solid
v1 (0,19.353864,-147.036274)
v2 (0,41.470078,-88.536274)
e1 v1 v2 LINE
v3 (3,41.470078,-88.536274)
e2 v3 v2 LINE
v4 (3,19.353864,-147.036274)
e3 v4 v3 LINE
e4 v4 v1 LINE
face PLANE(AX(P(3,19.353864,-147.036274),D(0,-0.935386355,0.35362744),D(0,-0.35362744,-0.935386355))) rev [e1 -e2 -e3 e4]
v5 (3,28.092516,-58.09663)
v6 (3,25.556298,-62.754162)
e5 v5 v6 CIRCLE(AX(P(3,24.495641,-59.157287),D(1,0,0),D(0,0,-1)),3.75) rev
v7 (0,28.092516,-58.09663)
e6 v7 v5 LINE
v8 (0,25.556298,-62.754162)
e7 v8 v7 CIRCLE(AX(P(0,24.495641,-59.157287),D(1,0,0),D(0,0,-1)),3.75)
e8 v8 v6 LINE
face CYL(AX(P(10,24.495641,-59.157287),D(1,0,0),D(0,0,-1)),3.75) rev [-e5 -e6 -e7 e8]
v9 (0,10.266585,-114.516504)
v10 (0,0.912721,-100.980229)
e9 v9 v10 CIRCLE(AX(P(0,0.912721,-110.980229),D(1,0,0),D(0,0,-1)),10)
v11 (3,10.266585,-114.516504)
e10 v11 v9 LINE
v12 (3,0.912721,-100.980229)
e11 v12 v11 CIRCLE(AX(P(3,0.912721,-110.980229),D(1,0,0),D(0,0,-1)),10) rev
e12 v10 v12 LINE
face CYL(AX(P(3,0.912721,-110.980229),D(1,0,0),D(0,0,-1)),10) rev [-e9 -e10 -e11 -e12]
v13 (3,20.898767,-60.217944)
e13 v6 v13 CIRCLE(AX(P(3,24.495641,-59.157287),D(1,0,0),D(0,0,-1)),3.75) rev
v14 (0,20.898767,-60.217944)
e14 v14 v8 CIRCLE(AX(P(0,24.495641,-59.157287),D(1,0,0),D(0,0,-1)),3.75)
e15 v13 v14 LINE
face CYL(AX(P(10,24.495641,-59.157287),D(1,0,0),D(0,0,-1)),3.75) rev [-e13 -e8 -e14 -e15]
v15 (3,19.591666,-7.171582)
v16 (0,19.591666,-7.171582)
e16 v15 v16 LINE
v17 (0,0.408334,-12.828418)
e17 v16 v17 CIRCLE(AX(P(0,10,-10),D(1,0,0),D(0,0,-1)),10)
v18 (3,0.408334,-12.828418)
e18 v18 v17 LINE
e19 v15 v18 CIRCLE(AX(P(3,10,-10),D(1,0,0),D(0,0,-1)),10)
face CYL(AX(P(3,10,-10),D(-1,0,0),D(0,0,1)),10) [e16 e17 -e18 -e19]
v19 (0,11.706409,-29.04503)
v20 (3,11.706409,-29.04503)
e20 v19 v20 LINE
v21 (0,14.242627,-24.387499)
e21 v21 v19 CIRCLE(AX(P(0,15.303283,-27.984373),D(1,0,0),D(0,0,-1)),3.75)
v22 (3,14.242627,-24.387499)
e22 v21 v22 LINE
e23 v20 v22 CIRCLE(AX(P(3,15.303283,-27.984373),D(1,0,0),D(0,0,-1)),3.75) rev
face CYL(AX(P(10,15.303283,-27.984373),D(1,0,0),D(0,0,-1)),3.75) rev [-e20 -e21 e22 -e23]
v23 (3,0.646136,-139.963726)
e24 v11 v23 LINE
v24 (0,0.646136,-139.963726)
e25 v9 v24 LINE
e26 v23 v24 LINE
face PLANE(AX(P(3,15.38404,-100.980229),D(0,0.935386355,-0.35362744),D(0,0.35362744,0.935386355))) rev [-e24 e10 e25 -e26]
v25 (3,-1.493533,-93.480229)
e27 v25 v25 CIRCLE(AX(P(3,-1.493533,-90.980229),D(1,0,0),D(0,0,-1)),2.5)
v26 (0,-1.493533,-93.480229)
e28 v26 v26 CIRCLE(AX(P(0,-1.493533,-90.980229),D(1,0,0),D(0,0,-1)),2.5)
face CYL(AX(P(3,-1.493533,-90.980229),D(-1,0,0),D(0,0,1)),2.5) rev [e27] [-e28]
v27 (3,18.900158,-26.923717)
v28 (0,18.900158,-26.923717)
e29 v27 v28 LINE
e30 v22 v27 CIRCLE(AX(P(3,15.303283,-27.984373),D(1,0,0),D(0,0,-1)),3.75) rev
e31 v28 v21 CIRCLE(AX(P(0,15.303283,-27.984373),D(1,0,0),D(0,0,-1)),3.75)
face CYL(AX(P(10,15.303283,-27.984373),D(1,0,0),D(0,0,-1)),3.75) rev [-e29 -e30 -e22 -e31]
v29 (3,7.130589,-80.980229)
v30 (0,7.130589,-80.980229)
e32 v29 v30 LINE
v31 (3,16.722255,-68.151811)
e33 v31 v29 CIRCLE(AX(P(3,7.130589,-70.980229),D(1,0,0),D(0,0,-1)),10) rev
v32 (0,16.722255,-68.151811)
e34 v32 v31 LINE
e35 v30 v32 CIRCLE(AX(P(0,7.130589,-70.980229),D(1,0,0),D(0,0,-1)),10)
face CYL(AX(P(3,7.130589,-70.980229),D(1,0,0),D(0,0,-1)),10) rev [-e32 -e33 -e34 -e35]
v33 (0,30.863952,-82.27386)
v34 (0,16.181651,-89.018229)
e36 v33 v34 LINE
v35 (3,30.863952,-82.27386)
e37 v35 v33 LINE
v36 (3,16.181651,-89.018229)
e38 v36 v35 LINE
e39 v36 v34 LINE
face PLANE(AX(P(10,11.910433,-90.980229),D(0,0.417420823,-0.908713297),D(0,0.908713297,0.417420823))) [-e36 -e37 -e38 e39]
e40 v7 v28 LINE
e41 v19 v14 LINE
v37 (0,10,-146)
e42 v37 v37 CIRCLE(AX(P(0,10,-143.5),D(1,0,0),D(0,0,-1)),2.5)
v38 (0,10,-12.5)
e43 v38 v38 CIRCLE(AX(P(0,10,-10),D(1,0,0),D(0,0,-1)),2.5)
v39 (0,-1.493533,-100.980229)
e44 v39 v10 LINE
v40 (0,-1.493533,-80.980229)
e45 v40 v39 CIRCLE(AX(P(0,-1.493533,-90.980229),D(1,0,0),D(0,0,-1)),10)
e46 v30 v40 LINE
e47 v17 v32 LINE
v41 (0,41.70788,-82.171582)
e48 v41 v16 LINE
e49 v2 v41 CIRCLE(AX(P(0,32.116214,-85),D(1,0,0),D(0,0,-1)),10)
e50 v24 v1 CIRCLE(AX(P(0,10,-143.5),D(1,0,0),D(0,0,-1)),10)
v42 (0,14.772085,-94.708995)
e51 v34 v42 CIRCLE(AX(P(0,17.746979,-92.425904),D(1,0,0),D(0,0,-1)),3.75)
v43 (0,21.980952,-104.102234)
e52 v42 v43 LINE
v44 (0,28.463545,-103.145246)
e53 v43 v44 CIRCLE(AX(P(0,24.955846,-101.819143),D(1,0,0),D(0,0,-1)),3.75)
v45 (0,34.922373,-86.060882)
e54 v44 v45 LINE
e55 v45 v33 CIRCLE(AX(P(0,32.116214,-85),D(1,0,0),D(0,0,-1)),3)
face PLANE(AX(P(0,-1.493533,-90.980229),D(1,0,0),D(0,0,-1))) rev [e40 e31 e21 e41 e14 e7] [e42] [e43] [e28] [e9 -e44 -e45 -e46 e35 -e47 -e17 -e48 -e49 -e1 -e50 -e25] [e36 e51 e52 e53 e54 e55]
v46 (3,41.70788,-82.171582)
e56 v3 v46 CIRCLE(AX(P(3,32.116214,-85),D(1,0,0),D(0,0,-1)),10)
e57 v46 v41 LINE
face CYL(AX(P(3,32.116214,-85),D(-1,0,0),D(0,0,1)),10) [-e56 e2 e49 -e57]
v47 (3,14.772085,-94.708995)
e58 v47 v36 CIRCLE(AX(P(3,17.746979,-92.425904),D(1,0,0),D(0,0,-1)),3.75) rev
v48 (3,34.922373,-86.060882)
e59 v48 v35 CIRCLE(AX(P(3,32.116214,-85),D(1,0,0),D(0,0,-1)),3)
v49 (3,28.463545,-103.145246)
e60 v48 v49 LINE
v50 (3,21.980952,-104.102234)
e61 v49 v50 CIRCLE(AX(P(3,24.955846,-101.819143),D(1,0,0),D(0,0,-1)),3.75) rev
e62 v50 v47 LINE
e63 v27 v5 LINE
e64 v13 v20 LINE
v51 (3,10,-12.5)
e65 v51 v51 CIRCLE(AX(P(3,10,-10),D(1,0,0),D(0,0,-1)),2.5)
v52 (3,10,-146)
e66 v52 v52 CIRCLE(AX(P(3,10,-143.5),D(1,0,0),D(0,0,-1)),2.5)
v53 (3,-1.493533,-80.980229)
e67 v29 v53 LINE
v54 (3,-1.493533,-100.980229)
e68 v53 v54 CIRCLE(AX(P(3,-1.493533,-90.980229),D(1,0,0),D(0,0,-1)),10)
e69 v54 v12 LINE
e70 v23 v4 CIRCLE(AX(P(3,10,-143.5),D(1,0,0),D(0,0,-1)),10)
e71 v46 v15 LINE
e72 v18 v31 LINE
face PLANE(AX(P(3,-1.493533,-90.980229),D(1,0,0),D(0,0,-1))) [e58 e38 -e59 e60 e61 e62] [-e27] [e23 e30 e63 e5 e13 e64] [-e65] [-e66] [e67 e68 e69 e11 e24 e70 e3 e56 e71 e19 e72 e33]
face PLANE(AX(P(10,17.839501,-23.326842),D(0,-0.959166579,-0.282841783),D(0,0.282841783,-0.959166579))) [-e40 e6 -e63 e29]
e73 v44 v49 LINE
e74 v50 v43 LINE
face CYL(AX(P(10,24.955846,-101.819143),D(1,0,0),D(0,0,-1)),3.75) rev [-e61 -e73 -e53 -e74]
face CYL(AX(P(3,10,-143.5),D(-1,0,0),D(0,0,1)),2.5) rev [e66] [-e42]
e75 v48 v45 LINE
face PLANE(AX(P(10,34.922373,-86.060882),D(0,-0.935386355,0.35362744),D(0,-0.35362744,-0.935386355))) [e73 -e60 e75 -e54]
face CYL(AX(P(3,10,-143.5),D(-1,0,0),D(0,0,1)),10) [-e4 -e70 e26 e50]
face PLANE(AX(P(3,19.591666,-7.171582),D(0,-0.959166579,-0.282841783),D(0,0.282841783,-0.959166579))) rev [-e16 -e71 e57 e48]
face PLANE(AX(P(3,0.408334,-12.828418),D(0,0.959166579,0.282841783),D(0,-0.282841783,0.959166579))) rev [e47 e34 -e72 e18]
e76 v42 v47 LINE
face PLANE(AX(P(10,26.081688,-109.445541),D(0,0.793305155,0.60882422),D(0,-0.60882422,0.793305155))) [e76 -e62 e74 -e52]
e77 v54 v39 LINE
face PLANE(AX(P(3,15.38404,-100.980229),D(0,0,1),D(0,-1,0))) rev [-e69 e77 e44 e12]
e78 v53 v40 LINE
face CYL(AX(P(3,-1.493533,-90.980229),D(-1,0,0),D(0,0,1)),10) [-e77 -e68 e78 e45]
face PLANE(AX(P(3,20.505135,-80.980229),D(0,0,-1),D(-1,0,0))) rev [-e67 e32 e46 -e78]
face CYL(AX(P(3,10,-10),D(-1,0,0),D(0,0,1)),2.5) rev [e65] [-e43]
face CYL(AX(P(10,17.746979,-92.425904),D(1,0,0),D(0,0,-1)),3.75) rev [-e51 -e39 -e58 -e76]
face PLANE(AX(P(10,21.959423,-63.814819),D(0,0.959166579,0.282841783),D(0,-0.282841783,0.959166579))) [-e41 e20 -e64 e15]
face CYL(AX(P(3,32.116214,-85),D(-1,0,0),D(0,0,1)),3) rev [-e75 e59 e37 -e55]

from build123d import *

# Parameters (mm, degrees)
SKETCH3_R           = 3
SKETCH3_R_2         = 2.5
BOSS_EXTRUDE2_DEPTH = 3
FILLET1_R           = 10
CUT_EXTRUDE1_DEPTH  = 10
FILLET2_R           = 3.75


with BuildPart() as part:
    # Sketch3 → Boss-Extrude2 (new body)
    with BuildSketch(Plane(origin=(0, 0, 0), x_dir=(0, 0, -1), z_dir=(1, 0, 0))):
        with BuildLine():
            Line((7.171582169, 19.591665787), (82.171582169, 41.707880218))
            ThreePointArc((82.171582169, 41.707880218), (85.373366716, 42.109241865), (88.536274395, 41.470077986))
            Line((88.536274395, 41.470077986), (147.036274395, 19.353863555))
            ThreePointArc((147.036274395, 19.353863555), (152.853863555, 6.463725605), (139.963725605, 0.646136445))
            Line((139.963725605, 0.646136445), (100.980229255, 15.384040113))
            Line((100.980229255, 15.384040113), (100.980229255, -1.493532665))
            ThreePointArc((100.980229255, -1.493532665), (90.980229255, -11.493532665), (80.980229255, -1.493532665))
            Line((80.980229255, -1.493532665), (80.980229255, 20.505135217))
            Line((80.980229255, 20.505135217), (12.828417831, 0.408334213))
            ThreePointArc((12.828417831, 0.408334213), (0.408334213, 7.171582169), (7.171582169, 19.591665787))
        make_face()
        with Locations((85, 32.116214431)):
            Circle(SKETCH3_R, mode=Mode.SUBTRACT)
        with Locations((90.980229255, -1.493532665)):
            Circle(SKETCH3_R_2, mode=Mode.SUBTRACT)
        with Locations((10, 10)):
            Circle(SKETCH3_R_2, mode=Mode.SUBTRACT)
        with Locations((143.5, 10)):
            Circle(SKETCH3_R_2, mode=Mode.SUBTRACT)
    extrude(amount=BOSS_EXTRUDE2_DEPTH)

    # Fillet1
    fillet1_edges = [part.edges().sort_by_distance(p)[0] for p in [
        (1.5, 20.505135217, -80.980229255),
        (1.5, 15.384040113, -100.980229255),
    ]]
    fillet(fillet1_edges, radius=FILLET1_R)

    # Sketch5 → Cut-Extrude1 (cut)
    with BuildSketch(Plane(origin=(0, 0, 0), x_dir=(0, 0, -1), z_dir=(1, 0, 0))):
        Polygon((23.326841994, 17.839501416), (61.693505144, 29.153172739), (63.814818517, 21.959423399), (25.448155367, 10.645752076), align=None)
        with BuildLine():
            Line((86.060882319, 34.922373497), (109.445541205, 26.081687509))
            Line((109.445541205, 26.081687509), (90.980229255, 11.910433147))
            Line((90.980229255, 11.910433147), (82.273860108, 30.863951963))
            ThreePointArc((82.273860108, 30.863951963), (82.806608326, 34.162927153), (86.060882319, 34.922373497))
        make_face()
    extrude(amount=CUT_EXTRUDE1_DEPTH, mode=Mode.SUBTRACT)

    # Fillet2
    fillet2_edges = [part.edges().sort_by_distance(p)[0] for p in [
        (1.5, 11.910433147, -90.980229255),
        (1.5, 26.081687509, -109.445541205),
        (1.5, 29.153172739, -61.693505144),
        (1.5, 21.959423399, -63.814818517),
        (1.5, 10.645752076, -25.448155367),
        (1.5, 17.839501416, -23.326841994),
    ]]
    fillet(fillet2_edges, radius=FILLET2_R - 0.0001)  # a hair under: the kernel refuses the full size


solid = part.part
